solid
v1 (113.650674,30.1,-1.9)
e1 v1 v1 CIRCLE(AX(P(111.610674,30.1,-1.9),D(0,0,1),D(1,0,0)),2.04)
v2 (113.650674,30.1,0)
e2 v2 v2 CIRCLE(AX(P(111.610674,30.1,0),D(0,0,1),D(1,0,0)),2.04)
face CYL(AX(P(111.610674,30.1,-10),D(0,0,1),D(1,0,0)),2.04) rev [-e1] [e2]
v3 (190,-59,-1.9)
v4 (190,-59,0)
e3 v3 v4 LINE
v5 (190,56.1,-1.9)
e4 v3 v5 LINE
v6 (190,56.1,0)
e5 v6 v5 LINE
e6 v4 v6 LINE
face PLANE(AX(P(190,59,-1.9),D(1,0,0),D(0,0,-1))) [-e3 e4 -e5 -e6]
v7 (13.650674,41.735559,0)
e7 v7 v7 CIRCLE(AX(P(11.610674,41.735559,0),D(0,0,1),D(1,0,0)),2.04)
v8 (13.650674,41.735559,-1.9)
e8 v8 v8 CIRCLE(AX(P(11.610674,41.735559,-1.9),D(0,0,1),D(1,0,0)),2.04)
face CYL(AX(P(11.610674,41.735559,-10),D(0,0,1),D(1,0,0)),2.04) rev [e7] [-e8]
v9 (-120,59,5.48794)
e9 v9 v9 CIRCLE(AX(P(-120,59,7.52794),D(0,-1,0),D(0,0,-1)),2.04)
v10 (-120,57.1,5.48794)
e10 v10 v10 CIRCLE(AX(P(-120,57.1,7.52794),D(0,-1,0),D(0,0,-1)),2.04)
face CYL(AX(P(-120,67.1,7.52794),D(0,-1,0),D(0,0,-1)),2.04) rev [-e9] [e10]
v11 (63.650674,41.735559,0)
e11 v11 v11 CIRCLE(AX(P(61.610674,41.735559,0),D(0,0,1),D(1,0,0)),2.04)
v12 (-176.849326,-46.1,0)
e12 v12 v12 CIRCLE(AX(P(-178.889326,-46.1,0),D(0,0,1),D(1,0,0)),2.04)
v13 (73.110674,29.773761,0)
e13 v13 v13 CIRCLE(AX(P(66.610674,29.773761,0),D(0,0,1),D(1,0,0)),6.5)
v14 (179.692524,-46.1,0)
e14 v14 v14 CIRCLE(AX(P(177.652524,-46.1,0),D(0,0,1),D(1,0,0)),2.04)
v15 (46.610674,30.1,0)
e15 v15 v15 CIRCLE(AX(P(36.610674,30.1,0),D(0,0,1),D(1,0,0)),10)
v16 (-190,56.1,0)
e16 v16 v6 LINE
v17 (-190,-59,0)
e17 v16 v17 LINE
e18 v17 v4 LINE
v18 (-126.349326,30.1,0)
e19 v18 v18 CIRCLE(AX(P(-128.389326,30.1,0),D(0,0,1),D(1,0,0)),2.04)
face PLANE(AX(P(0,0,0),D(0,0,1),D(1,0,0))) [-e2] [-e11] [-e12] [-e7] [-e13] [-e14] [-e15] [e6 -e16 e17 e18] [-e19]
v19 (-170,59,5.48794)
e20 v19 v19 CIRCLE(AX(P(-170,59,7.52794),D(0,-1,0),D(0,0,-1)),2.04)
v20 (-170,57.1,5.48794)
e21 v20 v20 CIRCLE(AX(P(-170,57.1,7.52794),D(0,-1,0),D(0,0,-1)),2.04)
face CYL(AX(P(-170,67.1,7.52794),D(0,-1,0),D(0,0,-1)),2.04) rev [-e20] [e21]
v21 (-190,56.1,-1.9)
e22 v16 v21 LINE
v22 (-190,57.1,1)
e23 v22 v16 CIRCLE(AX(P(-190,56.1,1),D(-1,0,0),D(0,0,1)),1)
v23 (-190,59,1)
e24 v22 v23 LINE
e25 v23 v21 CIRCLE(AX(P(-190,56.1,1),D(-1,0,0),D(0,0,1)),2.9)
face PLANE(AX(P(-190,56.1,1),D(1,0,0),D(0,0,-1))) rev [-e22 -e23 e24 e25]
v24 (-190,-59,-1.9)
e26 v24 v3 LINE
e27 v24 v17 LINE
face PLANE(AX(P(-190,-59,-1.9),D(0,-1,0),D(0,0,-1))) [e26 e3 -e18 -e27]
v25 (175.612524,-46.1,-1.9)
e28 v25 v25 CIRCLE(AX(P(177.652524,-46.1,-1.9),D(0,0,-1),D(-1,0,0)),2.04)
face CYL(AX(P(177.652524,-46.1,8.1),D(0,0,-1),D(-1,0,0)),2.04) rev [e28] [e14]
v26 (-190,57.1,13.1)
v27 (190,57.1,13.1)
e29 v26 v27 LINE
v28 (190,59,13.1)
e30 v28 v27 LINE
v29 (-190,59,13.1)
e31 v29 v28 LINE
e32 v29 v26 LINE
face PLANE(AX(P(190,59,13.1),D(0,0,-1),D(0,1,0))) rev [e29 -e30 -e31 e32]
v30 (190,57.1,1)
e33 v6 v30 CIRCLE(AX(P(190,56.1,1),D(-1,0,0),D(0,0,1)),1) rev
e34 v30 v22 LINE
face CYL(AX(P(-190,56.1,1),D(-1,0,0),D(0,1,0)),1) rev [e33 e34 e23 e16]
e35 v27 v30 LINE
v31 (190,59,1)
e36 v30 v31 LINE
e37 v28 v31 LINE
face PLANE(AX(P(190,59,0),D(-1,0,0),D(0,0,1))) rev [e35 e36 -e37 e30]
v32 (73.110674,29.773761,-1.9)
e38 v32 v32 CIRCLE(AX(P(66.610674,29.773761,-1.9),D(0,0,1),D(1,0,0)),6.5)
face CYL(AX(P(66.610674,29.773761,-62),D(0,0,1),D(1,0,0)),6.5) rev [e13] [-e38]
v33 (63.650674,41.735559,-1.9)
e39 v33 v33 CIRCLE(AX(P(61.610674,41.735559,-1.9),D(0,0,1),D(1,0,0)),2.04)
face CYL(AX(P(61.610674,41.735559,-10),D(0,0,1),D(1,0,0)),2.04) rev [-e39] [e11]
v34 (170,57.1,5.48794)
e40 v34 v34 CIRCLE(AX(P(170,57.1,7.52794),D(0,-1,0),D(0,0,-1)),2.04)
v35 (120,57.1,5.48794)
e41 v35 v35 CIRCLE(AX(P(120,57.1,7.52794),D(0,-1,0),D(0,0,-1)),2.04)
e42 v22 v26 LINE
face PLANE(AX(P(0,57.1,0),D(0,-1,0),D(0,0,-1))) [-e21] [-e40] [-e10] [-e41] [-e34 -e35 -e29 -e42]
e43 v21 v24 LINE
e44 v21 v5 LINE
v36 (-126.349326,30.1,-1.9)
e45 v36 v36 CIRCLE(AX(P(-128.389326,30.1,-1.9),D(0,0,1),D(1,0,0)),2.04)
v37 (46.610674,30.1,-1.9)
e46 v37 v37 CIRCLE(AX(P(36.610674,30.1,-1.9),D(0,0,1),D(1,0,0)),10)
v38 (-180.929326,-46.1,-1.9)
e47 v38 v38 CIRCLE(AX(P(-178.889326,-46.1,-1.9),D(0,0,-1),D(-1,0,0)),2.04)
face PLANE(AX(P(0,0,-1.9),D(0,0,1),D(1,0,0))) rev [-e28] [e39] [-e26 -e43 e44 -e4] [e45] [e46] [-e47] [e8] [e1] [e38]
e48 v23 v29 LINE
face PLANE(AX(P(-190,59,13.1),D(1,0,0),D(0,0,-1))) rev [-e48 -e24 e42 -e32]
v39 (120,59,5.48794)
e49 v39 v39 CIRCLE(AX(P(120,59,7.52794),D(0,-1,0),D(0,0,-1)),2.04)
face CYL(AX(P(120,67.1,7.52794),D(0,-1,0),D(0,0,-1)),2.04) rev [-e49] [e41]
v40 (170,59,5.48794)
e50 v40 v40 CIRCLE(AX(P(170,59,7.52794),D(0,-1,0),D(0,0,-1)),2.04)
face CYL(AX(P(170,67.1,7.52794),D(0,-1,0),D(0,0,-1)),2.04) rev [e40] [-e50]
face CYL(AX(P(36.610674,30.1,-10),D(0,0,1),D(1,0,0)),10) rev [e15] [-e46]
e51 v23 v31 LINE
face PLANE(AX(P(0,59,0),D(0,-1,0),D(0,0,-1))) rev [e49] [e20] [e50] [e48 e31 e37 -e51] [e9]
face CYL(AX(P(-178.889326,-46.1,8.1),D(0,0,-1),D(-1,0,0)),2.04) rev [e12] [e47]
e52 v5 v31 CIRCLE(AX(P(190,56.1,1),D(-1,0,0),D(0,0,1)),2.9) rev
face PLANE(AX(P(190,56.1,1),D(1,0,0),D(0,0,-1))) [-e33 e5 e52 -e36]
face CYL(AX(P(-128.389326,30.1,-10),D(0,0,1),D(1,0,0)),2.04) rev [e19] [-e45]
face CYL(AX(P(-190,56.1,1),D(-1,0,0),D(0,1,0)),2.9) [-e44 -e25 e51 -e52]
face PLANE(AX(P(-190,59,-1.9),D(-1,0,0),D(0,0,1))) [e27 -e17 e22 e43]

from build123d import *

# Parameters (mm, degrees)
SKETCH1_W                    = 380
SKETCH1_H                    = 118
BASE_FLANGE1_DEPTH           = 1.9
EDGE_FLANGE1_STRIP_W         = 9.6
EDGE_FLANGE1_STRIP_H         = 1.9
EDGE_FLANGE1_STRIP_CUT_DEPTH = 380
EDGE_FLANGE1_DEPTH           = 380
SKETCH9_R                    = 10
SKETCH9_R_2                  = 2.04
CUT_EXTRUDE1_DEPTH           = 10
SKETCH10_R                   = 2.04
CUT_EXTRUDE2_DEPTH           = 10
SKETCH11_R                   = 2.04
CUT_EXTRUDE3_DEPTH           = 10
SKETCH12_R                   = 2.04
CUT_EXTRUDE4_DEPTH           = 10
SKETCH13_R                   = 6.5
CUT_EXTRUDE5_DEPTH           = 62


# Sheet-metal steps are written as plain solids
with BuildPart() as part:
    # Sketch1 → Base-Flange1 (new body)
    with BuildSketch(Plane.XY):
        Rectangle(SKETCH1_W, SKETCH1_H)
    extrude(amount=-BASE_FLANGE1_DEPTH)

    # Edge-Flange1 strip (across the edge) → Edge-Flange1 strip cut (cut)
    with BuildSketch(Plane(origin=(190, 59, 0), x_dir=(0, -1, 0), z_dir=(-1, 0, 0))):
        with Locations((-1.9, -0.95)):
            Rectangle(EDGE_FLANGE1_STRIP_W, EDGE_FLANGE1_STRIP_H)
    extrude(amount=EDGE_FLANGE1_STRIP_CUT_DEPTH, mode=Mode.SUBTRACT)

    # Edge-Flange1 section (across the edge) → Edge-Flange1 (add)
    with BuildSketch(Plane(origin=(190, 59, 0), x_dir=(0, -1, 0), z_dir=(-1, 0, 0))):
        with BuildLine():
            Line((0, 1), (0, 13.1))
            Line((0, 13.1), (1.9, 13.1))
            Line((1.9, 13.1), (1.9, 1))
            ThreePointArc((1.9, 1), (2.192893219, 0.292893219), (2.9, 0))
            Line((2.9, 0), (2.9, -1.9))
            ThreePointArc((2.9, -1.9), (0.849390335, -1.050609665), (0, 1))
        make_face()
    extrude(amount=EDGE_FLANGE1_DEPTH)

    # Sketch9 → Cut-Extrude1 (cut)
    with BuildSketch(Plane.XY):
        with Locations((36.610673768, 30.1)):
            Circle(SKETCH9_R)
        with Locations((-128.389326232, 30.1)):
            Circle(SKETCH9_R_2)
        with Locations((111.610673768, 30.1)):
            Circle(SKETCH9_R_2)
    extrude(amount=-CUT_EXTRUDE1_DEPTH, mode=Mode.SUBTRACT)

    # Sketch10 → Cut-Extrude2 (cut)
    with BuildSketch(Plane.XZ.offset(-57.1)):
        with Locations(Location((-170, 7.52794, 0), (0, 0, 270))):
            Circle(SKETCH10_R)
        with Locations(Location((-120, 7.52794, 0), (0, 0, 270))):
            Circle(SKETCH10_R)
        with Locations(Location((170, 7.52794, 0), (0, 0, 270))):
            Circle(SKETCH10_R)
        with Locations(Location((120, 7.52794, 0), (0, 0, 270))):
            Circle(SKETCH10_R)
    extrude(amount=-CUT_EXTRUDE2_DEPTH, mode=Mode.SUBTRACT)

    # Sketch11 → Cut-Extrude3 (cut)
    with BuildSketch(Plane(origin=(0, 0, -1.9), x_dir=(-1, 0, 0), z_dir=(0, 0, -1))):
        with Locations((178.889326232, -46.1)):
            Circle(SKETCH11_R)
        with Locations((-177.652523634, -46.1)):
            Circle(SKETCH11_R)
    extrude(amount=-CUT_EXTRUDE3_DEPTH, mode=Mode.SUBTRACT)

    # Sketch12 → Cut-Extrude4 (cut)
    with BuildSketch(Plane.XY):
        with Locations((11.610673768, 41.735559355)):
            Circle(SKETCH12_R)
        with Locations((61.610673768, 41.735559355)):
            Circle(SKETCH12_R)
    extrude(amount=-CUT_EXTRUDE4_DEPTH, mode=Mode.SUBTRACT)

    # Sketch13 → Cut-Extrude5 (cut)
    with BuildSketch(Plane.XY):
        with Locations((66.610673768, 29.7737606)):
            Circle(SKETCH13_R)
    extrude(amount=-CUT_EXTRUDE5_DEPTH, mode=Mode.SUBTRACT)


solid = part.part
